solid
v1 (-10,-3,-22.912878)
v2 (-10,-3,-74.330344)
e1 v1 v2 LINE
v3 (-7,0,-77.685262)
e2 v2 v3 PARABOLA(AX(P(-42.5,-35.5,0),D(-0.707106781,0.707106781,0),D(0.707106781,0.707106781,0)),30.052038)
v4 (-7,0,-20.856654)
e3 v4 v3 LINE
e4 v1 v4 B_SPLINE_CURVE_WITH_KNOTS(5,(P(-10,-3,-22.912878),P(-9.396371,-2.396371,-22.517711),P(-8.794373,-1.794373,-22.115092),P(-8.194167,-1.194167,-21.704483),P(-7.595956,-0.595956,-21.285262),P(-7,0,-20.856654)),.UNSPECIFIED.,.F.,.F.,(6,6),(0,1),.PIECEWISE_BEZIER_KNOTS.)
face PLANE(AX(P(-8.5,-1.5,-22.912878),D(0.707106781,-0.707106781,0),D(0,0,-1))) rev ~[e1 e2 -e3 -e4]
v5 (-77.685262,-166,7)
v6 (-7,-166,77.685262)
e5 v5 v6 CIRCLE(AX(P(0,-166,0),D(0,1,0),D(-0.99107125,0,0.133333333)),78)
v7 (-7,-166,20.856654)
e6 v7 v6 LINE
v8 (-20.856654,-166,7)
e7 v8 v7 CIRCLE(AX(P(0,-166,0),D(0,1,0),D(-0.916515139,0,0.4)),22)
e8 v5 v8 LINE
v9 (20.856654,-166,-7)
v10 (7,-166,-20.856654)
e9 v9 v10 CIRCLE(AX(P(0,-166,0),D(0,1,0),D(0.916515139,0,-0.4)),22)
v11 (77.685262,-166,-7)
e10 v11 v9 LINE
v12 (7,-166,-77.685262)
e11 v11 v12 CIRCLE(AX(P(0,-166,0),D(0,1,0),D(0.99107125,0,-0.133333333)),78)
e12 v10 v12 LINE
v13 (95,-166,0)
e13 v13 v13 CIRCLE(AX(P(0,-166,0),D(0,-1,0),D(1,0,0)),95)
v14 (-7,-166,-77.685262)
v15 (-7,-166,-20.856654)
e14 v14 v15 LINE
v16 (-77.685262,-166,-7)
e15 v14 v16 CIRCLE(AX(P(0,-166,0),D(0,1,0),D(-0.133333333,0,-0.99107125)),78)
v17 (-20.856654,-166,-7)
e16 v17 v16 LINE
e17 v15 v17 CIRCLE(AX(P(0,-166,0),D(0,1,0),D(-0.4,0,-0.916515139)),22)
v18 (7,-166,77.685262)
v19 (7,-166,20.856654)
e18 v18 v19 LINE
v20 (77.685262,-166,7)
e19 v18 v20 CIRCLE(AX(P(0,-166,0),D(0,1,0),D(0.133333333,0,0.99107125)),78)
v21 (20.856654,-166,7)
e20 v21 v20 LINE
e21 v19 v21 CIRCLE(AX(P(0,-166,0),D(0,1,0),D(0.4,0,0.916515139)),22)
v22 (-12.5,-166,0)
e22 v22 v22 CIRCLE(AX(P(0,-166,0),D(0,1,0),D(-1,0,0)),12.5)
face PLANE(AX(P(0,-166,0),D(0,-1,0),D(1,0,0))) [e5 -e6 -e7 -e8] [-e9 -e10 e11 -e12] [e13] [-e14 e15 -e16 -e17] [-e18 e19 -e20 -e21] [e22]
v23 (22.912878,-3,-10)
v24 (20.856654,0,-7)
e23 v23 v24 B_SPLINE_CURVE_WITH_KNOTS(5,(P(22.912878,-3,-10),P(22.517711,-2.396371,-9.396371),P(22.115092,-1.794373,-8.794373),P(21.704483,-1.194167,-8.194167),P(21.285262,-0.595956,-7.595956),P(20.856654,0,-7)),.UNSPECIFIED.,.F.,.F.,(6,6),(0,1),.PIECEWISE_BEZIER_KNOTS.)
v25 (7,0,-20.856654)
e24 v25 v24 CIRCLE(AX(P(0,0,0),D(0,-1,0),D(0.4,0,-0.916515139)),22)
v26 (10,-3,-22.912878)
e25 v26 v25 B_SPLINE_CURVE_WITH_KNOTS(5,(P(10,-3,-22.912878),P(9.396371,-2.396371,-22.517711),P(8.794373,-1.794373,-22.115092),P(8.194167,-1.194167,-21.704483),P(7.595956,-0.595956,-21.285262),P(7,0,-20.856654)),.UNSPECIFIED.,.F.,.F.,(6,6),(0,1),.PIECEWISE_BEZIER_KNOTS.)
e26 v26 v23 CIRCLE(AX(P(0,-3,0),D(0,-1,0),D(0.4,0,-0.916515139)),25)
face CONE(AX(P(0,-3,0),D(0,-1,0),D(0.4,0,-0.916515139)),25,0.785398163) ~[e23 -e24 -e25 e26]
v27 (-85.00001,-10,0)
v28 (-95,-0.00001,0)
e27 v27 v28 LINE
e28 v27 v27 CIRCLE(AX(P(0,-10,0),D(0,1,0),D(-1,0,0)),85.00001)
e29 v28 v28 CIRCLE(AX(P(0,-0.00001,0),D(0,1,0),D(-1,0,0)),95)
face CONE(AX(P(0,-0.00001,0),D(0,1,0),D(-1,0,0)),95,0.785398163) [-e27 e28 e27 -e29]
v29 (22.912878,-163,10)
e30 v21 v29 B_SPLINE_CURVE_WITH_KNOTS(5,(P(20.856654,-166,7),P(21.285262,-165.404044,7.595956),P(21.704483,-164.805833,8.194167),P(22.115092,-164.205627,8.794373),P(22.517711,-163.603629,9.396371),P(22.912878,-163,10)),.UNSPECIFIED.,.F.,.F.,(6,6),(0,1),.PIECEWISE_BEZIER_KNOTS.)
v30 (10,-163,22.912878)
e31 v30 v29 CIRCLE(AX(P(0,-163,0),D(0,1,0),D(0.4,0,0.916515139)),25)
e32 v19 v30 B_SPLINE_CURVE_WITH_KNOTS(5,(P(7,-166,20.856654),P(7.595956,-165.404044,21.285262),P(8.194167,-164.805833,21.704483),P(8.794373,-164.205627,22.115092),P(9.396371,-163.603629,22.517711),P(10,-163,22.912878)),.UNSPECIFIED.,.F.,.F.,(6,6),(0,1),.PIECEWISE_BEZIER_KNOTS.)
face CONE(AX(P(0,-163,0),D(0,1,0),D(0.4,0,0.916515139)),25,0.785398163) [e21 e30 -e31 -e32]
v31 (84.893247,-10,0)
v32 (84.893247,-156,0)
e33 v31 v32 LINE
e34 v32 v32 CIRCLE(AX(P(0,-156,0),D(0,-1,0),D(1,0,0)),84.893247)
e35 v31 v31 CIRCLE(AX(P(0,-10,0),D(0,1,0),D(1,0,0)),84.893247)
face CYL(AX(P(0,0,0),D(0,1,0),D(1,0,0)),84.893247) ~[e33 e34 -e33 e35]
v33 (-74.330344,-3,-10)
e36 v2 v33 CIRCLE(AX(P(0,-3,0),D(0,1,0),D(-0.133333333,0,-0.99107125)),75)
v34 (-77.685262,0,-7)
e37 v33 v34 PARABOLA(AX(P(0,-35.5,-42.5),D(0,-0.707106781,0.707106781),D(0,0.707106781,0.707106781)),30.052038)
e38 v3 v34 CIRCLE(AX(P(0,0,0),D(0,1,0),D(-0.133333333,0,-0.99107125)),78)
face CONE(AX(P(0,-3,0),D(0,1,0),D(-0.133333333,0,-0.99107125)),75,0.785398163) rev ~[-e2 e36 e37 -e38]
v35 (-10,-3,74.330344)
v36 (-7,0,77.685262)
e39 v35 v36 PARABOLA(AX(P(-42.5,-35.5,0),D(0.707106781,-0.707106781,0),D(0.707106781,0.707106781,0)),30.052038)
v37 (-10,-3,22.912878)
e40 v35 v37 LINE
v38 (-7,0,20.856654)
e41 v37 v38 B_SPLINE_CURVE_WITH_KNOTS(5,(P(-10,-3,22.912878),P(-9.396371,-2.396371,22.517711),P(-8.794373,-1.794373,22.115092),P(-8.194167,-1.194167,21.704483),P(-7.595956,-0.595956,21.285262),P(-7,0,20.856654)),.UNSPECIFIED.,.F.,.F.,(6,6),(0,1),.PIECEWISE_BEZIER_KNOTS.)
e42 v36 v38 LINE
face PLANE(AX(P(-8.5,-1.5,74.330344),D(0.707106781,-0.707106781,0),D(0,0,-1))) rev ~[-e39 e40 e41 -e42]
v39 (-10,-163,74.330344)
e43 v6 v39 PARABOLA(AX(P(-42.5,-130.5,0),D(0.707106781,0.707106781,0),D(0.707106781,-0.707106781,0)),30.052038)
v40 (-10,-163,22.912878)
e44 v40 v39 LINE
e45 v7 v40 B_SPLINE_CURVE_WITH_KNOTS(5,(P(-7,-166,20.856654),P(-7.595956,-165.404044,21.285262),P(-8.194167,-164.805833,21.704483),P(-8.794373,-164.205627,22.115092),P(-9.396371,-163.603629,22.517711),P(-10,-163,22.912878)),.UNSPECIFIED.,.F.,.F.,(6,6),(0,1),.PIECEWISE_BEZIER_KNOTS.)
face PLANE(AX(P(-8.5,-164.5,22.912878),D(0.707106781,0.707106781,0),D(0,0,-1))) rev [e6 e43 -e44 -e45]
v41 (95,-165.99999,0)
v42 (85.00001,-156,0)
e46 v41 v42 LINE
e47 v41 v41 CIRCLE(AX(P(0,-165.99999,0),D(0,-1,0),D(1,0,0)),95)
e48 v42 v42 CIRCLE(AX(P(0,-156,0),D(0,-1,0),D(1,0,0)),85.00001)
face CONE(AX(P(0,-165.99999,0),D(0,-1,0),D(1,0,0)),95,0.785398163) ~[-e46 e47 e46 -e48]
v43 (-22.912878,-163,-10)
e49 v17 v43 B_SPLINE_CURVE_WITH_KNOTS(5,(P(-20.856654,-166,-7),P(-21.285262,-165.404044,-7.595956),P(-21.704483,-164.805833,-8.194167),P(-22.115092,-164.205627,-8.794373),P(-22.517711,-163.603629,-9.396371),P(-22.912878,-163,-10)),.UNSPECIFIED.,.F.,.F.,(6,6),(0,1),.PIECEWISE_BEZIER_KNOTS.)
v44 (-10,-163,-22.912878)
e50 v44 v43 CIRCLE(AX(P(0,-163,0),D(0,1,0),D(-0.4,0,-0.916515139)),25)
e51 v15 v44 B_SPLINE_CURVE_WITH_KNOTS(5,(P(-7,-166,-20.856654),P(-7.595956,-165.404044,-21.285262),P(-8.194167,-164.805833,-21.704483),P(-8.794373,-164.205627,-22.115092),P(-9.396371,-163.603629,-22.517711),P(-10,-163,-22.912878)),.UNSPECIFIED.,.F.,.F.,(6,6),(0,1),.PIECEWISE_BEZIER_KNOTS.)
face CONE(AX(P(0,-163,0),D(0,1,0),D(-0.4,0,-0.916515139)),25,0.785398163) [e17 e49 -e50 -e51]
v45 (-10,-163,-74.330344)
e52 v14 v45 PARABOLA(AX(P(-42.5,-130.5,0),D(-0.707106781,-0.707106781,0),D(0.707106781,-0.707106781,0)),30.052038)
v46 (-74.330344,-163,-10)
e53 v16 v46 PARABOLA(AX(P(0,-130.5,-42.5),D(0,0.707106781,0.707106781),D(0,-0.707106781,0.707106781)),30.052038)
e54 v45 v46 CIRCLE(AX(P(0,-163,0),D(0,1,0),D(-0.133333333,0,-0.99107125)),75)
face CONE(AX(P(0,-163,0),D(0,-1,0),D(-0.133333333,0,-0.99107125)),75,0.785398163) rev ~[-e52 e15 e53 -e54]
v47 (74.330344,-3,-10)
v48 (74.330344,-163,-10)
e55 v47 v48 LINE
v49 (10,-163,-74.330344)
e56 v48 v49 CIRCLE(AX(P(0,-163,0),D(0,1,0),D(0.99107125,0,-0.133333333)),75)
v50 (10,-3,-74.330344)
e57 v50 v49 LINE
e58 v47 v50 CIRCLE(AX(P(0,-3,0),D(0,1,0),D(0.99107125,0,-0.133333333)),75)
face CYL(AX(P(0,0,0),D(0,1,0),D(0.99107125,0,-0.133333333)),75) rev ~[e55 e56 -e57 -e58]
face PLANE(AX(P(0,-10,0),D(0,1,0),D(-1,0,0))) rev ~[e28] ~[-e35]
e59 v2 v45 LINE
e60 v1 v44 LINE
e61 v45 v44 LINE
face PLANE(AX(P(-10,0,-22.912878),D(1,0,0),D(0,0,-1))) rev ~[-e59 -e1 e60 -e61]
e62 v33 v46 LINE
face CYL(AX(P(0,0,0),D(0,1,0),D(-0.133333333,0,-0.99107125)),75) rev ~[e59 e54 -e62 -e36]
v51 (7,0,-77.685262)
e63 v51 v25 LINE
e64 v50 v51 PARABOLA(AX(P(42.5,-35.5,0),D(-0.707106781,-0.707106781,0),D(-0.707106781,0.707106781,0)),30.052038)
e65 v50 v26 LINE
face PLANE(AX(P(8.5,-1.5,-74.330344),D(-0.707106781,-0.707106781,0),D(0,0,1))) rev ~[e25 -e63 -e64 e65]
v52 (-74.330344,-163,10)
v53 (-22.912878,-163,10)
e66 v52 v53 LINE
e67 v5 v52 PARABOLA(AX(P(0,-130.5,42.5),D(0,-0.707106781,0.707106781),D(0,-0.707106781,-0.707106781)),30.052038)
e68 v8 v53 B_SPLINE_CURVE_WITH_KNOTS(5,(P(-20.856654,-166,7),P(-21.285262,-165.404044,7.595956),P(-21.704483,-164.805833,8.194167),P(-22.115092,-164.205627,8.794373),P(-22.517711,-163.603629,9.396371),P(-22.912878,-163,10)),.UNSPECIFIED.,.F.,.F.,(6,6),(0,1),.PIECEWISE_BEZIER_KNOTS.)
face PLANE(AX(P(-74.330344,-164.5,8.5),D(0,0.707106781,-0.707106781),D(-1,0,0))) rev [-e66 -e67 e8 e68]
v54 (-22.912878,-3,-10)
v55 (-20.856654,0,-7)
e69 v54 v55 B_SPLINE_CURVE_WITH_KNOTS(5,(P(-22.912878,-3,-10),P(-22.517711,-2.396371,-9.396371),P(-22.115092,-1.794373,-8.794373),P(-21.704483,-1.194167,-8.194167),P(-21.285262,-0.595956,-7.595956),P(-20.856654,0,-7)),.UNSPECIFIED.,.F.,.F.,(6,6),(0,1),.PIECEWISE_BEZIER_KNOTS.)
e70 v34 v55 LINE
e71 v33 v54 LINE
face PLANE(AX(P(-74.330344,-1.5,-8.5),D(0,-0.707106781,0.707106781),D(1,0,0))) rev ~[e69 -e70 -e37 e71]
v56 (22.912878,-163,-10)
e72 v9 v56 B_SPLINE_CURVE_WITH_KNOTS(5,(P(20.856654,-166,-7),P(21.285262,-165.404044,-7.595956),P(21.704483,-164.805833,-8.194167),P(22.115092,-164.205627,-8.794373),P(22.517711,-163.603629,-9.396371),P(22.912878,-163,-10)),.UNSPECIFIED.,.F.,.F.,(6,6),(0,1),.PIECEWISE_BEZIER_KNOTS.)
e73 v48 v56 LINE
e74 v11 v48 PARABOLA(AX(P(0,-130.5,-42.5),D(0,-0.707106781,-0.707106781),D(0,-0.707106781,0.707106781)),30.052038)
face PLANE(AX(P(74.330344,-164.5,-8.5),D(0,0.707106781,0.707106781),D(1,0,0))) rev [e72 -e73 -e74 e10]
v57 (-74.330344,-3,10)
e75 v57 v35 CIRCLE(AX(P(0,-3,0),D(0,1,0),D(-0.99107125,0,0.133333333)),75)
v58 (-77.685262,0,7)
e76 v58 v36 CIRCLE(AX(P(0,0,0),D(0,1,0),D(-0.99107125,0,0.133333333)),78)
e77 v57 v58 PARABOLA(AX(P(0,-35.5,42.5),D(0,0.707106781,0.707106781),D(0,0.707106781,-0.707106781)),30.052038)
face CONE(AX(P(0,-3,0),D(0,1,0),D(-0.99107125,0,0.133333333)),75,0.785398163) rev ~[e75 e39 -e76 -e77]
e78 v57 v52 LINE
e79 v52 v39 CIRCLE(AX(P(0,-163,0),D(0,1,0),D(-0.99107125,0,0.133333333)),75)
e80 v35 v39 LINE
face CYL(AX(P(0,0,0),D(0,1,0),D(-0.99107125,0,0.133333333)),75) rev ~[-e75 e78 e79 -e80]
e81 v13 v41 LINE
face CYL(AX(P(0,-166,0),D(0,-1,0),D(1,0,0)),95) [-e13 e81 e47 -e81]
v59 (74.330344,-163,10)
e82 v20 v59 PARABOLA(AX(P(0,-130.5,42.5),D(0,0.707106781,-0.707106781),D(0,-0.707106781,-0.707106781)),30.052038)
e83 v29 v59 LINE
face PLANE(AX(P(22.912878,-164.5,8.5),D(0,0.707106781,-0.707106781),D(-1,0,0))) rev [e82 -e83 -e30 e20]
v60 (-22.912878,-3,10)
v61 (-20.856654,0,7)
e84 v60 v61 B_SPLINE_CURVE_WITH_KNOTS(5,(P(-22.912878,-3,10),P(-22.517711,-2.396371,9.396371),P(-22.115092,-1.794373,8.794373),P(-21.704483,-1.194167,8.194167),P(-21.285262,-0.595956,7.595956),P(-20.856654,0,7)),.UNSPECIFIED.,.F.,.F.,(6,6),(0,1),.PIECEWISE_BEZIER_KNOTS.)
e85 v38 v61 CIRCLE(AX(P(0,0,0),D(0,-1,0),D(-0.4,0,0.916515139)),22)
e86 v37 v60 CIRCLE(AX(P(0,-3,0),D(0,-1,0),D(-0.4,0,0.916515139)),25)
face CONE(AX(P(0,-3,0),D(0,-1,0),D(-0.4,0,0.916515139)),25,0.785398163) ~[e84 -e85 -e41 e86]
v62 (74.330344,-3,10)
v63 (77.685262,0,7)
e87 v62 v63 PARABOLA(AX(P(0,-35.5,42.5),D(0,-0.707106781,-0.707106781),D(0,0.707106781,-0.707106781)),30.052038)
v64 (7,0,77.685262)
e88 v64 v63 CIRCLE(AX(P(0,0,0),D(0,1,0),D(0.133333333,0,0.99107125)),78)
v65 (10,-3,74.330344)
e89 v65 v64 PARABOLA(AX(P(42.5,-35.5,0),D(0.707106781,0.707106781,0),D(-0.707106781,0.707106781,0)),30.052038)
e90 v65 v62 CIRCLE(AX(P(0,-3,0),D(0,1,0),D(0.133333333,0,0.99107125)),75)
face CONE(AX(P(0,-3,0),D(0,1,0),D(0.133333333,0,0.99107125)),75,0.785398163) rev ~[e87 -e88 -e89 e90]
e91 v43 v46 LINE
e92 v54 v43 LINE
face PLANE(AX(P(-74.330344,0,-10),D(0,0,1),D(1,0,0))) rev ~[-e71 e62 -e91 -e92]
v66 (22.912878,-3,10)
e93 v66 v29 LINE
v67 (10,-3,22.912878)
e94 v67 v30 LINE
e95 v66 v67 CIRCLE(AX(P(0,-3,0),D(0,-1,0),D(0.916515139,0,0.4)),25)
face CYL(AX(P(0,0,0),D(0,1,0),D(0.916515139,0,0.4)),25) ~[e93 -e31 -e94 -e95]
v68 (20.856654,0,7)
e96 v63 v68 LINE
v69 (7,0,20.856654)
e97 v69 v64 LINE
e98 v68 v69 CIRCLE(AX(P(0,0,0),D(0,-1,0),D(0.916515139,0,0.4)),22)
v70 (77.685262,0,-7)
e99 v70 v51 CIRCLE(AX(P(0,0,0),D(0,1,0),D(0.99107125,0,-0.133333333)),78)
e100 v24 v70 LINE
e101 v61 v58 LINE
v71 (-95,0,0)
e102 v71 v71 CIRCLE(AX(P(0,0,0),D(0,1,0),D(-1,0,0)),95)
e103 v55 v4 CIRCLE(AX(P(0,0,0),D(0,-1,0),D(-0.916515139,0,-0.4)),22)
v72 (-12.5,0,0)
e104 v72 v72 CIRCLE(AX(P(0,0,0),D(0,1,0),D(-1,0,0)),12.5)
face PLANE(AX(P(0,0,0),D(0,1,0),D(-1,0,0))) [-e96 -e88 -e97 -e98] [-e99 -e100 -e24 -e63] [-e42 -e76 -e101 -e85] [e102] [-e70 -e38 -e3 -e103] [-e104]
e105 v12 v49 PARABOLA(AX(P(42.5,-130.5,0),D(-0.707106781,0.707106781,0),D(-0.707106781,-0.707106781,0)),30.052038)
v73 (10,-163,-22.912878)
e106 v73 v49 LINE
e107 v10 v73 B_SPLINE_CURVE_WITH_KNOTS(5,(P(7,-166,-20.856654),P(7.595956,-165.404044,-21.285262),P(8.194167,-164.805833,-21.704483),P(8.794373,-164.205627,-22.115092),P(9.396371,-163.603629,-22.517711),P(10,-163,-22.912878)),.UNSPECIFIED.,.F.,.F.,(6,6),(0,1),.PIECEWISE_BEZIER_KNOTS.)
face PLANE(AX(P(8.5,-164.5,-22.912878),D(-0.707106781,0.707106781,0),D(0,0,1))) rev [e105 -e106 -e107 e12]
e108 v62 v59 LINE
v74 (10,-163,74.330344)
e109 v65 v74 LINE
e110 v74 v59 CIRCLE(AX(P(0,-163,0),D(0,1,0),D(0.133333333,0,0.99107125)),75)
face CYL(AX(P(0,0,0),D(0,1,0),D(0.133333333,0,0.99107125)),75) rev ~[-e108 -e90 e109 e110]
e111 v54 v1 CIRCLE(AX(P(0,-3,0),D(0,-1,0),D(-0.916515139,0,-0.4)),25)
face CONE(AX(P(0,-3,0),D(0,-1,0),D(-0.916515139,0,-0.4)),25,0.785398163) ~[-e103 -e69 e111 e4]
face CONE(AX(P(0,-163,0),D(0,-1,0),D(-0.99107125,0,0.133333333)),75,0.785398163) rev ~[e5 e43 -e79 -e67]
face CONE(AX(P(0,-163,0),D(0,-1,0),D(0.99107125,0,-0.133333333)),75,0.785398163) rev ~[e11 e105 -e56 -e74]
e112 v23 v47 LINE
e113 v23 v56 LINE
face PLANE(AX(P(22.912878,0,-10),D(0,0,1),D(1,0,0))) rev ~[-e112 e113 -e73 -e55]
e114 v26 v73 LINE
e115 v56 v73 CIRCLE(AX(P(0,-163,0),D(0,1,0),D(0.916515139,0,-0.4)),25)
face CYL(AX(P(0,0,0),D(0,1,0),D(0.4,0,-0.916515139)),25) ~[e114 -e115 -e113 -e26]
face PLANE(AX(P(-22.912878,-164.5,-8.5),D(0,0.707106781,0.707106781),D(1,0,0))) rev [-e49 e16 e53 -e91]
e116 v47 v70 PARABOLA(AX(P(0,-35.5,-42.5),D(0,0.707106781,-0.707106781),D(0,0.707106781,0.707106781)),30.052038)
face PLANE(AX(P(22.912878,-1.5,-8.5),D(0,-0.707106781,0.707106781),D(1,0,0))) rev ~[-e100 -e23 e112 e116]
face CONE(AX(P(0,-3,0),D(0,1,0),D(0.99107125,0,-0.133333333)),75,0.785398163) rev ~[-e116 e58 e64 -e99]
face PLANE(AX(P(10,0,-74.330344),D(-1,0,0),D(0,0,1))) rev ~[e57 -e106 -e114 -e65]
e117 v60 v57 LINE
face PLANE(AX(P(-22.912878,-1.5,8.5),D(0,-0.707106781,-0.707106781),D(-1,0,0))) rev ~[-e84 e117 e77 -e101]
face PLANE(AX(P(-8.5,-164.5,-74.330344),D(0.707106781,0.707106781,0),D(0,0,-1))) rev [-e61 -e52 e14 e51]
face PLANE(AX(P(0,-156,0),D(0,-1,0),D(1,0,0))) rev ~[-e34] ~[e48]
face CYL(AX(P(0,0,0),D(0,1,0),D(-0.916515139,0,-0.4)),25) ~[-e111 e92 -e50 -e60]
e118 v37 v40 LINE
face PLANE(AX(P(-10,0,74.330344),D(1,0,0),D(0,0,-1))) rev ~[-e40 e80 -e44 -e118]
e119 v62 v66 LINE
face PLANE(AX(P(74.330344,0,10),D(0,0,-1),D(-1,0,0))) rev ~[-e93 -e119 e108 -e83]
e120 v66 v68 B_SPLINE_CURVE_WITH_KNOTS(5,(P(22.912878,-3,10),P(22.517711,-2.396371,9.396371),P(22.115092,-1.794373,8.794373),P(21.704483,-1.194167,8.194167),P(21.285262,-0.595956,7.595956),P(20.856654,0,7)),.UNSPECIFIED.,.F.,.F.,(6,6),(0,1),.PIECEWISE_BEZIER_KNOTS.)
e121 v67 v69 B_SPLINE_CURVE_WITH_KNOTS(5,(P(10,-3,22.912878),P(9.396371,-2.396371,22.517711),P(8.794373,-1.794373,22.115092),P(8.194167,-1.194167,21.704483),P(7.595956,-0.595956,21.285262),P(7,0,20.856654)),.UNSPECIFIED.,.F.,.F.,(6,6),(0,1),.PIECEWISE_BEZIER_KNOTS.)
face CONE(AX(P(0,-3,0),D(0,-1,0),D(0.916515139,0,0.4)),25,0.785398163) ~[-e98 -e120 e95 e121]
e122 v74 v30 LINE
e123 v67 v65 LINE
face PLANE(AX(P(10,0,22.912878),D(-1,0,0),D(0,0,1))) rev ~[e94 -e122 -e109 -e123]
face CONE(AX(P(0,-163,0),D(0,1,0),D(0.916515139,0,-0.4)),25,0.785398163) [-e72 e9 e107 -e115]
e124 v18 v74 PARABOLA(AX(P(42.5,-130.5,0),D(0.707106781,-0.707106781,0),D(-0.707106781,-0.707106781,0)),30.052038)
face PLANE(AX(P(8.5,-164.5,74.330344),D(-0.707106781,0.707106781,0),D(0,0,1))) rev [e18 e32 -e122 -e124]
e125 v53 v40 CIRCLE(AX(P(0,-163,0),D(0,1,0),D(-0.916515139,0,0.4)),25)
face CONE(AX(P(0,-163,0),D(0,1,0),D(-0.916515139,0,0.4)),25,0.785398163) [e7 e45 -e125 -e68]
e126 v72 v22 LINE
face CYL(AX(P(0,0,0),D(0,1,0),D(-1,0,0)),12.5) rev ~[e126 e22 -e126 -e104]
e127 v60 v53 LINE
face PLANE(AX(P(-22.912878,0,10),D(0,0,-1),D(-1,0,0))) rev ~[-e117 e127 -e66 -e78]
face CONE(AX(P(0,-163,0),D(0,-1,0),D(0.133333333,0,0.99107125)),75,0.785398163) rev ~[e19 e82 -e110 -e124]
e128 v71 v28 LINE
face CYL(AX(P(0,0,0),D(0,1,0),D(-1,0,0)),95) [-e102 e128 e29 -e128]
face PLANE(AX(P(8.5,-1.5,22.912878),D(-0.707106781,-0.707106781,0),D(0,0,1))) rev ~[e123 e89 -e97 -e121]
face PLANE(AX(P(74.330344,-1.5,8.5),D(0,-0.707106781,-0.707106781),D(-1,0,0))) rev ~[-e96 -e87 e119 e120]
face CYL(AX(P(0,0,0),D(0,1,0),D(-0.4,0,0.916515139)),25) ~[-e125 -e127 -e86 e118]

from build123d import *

# Parameters (mm, degrees)
F0_R     = 84.89324665
F1_DEPTH = 166
F2_R     = 95
F2_R_2   = 84.89324665
F3_DEPTH = 10
F4_R     = 95
F4_R_2   = 84.89324665
F5_DEPTH = 10
F6_SIZE  = 9.99999
F7_R     = 12.5
F8_DEPTH = 166.001
F9_SIZE  = 3


# Not quite as in the source:
# - a fillet or chamfer is up to 0.001 mm smaller than in the source, because OpenCascade refuses the exact size


with BuildPart() as f1:
    # F0 (on Front) → F1 (new body)
    with BuildSketch(Plane.XZ):
        Circle(F0_R)
    extrude(amount=F1_DEPTH)

    # F2 (on face) → F3 (join)
    with BuildSketch(Plane(origin=(0, 0, 0), x_dir=(-1, 0, 0), z_dir=(0, 1, 0))):
        Circle(F2_R)
        Circle(F2_R_2, mode=Mode.SUBTRACT)
    extrude(amount=-F3_DEPTH)

    # F4 (on face) → F5 (join)
    with BuildSketch(Plane.XZ.offset(166)):
        Circle(F4_R)
        Circle(F4_R_2, mode=Mode.SUBTRACT)
    extrude(amount=-F5_DEPTH)

    # F6 (size 10 in the source; OpenCascade refuses exactly that, so slightly less here)
    f6_edges = [f1.edges().sort_by_distance(p)[0] for p in [
        (95, -10, 0),
        (-95, -156, 0),
    ]]
    chamfer(f6_edges, length=F6_SIZE)

    # F7 (on face) → F8 (cut, through all)
    with BuildSketch(Plane(origin=(0, 0, 0), x_dir=(-1, 0, 0), z_dir=(0, 1, 0))):
        with BuildLine():
            Line((-10, 22.9128784748), (-10, 74.3303437366))
            ThreePointArc((-10, 74.3303437366), (-53.033008589, 53.033008589), (-74.3303437366, 10))
            Line((-74.3303437366, 10), (-22.9128784748, 10))
            ThreePointArc((-22.9128784748, 10), (-17.6776695297, 17.6776695297), (-10, 22.9128784748))
        make_face()
        with BuildLine():
            Line((22.9128784748, 10), (74.3303437366, 10))
            ThreePointArc((74.3303437366, 10), (53.033008589, 53.033008589), (10, 74.3303437366))
            Line((10, 74.3303437366), (10, 22.9128784748))
            ThreePointArc((10, 22.9128784748), (17.6776695297, 17.6776695297), (22.9128784748, 10))
        make_face()
        with BuildLine():
            ThreePointArc((-74.3303437366, -10), (-53.033008589, -53.033008589), (-10, -74.3303437366))
            Line((-10, -74.3303437366), (-10, -22.9128784748))
            ThreePointArc((-10, -22.9128784748), (-17.6776695297, -17.6776695297), (-22.9128784748, -10))
            Line((-22.9128784748, -10), (-74.3303437366, -10))
        make_face()
        with BuildLine():
            ThreePointArc((10, -74.3303437366), (53.033008589, -53.033008589), (74.3303437366, -10))
            Line((74.3303437366, -10), (22.9128784748, -10))
            ThreePointArc((22.9128784748, -10), (17.6776695297, -17.6776695297), (10, -22.9128784748))
            Line((10, -22.9128784748), (10, -74.3303437366))
        make_face()
        Circle(F7_R)
    extrude(amount=-F8_DEPTH, mode=Mode.SUBTRACT)

    # F9
    f9_edges = [f1.edges().sort_by_distance(p)[0] for p in [
        (-53.033009, -166, 53.033009),
        (-10, -166, 48.621611),
        (-48.621611, -166, 10),
        (-17.67767, -166, 17.67767),
        (53.033009, -166, 53.033009),
        (48.621611, -166, 10),
        (17.67767, -166, 17.67767),
        (10, -166, 48.621611),
        (48.621611, -166, -10),
        (53.033009, -166, -53.033009),
        (17.67767, -166, -17.67767),
        (10, -166, -48.621611),
        (-10, -166, -48.621611),
        (-17.67767, -166, -17.67767),
        (-48.621611, -166, -10),
        (-53.033009, -166, -53.033009),
        (-53.033009, 0, 53.033009),
        (-10, 0, 48.621611),
        (-17.67767, 0, 17.67767),
        (-48.621611, 0, 10),
        (-53.033009, 0, -53.033009),
        (-48.621611, 0, -10),
        (-17.67767, 0, -17.67767),
        (-10, 0, -48.621611),
        (10, 0, 48.621611),
        (53.033009, 0, 53.033009),
        (17.67767, 0, 17.67767),
        (48.621611, 0, 10),
        (17.67767, 0, -17.67767),
        (10, 0, -48.621611),
        (48.621611, 0, -10),
        (53.033009, 0, -53.033009),
    ]]
    chamfer(f9_edges, length=F9_SIZE)


solid = f1.part
